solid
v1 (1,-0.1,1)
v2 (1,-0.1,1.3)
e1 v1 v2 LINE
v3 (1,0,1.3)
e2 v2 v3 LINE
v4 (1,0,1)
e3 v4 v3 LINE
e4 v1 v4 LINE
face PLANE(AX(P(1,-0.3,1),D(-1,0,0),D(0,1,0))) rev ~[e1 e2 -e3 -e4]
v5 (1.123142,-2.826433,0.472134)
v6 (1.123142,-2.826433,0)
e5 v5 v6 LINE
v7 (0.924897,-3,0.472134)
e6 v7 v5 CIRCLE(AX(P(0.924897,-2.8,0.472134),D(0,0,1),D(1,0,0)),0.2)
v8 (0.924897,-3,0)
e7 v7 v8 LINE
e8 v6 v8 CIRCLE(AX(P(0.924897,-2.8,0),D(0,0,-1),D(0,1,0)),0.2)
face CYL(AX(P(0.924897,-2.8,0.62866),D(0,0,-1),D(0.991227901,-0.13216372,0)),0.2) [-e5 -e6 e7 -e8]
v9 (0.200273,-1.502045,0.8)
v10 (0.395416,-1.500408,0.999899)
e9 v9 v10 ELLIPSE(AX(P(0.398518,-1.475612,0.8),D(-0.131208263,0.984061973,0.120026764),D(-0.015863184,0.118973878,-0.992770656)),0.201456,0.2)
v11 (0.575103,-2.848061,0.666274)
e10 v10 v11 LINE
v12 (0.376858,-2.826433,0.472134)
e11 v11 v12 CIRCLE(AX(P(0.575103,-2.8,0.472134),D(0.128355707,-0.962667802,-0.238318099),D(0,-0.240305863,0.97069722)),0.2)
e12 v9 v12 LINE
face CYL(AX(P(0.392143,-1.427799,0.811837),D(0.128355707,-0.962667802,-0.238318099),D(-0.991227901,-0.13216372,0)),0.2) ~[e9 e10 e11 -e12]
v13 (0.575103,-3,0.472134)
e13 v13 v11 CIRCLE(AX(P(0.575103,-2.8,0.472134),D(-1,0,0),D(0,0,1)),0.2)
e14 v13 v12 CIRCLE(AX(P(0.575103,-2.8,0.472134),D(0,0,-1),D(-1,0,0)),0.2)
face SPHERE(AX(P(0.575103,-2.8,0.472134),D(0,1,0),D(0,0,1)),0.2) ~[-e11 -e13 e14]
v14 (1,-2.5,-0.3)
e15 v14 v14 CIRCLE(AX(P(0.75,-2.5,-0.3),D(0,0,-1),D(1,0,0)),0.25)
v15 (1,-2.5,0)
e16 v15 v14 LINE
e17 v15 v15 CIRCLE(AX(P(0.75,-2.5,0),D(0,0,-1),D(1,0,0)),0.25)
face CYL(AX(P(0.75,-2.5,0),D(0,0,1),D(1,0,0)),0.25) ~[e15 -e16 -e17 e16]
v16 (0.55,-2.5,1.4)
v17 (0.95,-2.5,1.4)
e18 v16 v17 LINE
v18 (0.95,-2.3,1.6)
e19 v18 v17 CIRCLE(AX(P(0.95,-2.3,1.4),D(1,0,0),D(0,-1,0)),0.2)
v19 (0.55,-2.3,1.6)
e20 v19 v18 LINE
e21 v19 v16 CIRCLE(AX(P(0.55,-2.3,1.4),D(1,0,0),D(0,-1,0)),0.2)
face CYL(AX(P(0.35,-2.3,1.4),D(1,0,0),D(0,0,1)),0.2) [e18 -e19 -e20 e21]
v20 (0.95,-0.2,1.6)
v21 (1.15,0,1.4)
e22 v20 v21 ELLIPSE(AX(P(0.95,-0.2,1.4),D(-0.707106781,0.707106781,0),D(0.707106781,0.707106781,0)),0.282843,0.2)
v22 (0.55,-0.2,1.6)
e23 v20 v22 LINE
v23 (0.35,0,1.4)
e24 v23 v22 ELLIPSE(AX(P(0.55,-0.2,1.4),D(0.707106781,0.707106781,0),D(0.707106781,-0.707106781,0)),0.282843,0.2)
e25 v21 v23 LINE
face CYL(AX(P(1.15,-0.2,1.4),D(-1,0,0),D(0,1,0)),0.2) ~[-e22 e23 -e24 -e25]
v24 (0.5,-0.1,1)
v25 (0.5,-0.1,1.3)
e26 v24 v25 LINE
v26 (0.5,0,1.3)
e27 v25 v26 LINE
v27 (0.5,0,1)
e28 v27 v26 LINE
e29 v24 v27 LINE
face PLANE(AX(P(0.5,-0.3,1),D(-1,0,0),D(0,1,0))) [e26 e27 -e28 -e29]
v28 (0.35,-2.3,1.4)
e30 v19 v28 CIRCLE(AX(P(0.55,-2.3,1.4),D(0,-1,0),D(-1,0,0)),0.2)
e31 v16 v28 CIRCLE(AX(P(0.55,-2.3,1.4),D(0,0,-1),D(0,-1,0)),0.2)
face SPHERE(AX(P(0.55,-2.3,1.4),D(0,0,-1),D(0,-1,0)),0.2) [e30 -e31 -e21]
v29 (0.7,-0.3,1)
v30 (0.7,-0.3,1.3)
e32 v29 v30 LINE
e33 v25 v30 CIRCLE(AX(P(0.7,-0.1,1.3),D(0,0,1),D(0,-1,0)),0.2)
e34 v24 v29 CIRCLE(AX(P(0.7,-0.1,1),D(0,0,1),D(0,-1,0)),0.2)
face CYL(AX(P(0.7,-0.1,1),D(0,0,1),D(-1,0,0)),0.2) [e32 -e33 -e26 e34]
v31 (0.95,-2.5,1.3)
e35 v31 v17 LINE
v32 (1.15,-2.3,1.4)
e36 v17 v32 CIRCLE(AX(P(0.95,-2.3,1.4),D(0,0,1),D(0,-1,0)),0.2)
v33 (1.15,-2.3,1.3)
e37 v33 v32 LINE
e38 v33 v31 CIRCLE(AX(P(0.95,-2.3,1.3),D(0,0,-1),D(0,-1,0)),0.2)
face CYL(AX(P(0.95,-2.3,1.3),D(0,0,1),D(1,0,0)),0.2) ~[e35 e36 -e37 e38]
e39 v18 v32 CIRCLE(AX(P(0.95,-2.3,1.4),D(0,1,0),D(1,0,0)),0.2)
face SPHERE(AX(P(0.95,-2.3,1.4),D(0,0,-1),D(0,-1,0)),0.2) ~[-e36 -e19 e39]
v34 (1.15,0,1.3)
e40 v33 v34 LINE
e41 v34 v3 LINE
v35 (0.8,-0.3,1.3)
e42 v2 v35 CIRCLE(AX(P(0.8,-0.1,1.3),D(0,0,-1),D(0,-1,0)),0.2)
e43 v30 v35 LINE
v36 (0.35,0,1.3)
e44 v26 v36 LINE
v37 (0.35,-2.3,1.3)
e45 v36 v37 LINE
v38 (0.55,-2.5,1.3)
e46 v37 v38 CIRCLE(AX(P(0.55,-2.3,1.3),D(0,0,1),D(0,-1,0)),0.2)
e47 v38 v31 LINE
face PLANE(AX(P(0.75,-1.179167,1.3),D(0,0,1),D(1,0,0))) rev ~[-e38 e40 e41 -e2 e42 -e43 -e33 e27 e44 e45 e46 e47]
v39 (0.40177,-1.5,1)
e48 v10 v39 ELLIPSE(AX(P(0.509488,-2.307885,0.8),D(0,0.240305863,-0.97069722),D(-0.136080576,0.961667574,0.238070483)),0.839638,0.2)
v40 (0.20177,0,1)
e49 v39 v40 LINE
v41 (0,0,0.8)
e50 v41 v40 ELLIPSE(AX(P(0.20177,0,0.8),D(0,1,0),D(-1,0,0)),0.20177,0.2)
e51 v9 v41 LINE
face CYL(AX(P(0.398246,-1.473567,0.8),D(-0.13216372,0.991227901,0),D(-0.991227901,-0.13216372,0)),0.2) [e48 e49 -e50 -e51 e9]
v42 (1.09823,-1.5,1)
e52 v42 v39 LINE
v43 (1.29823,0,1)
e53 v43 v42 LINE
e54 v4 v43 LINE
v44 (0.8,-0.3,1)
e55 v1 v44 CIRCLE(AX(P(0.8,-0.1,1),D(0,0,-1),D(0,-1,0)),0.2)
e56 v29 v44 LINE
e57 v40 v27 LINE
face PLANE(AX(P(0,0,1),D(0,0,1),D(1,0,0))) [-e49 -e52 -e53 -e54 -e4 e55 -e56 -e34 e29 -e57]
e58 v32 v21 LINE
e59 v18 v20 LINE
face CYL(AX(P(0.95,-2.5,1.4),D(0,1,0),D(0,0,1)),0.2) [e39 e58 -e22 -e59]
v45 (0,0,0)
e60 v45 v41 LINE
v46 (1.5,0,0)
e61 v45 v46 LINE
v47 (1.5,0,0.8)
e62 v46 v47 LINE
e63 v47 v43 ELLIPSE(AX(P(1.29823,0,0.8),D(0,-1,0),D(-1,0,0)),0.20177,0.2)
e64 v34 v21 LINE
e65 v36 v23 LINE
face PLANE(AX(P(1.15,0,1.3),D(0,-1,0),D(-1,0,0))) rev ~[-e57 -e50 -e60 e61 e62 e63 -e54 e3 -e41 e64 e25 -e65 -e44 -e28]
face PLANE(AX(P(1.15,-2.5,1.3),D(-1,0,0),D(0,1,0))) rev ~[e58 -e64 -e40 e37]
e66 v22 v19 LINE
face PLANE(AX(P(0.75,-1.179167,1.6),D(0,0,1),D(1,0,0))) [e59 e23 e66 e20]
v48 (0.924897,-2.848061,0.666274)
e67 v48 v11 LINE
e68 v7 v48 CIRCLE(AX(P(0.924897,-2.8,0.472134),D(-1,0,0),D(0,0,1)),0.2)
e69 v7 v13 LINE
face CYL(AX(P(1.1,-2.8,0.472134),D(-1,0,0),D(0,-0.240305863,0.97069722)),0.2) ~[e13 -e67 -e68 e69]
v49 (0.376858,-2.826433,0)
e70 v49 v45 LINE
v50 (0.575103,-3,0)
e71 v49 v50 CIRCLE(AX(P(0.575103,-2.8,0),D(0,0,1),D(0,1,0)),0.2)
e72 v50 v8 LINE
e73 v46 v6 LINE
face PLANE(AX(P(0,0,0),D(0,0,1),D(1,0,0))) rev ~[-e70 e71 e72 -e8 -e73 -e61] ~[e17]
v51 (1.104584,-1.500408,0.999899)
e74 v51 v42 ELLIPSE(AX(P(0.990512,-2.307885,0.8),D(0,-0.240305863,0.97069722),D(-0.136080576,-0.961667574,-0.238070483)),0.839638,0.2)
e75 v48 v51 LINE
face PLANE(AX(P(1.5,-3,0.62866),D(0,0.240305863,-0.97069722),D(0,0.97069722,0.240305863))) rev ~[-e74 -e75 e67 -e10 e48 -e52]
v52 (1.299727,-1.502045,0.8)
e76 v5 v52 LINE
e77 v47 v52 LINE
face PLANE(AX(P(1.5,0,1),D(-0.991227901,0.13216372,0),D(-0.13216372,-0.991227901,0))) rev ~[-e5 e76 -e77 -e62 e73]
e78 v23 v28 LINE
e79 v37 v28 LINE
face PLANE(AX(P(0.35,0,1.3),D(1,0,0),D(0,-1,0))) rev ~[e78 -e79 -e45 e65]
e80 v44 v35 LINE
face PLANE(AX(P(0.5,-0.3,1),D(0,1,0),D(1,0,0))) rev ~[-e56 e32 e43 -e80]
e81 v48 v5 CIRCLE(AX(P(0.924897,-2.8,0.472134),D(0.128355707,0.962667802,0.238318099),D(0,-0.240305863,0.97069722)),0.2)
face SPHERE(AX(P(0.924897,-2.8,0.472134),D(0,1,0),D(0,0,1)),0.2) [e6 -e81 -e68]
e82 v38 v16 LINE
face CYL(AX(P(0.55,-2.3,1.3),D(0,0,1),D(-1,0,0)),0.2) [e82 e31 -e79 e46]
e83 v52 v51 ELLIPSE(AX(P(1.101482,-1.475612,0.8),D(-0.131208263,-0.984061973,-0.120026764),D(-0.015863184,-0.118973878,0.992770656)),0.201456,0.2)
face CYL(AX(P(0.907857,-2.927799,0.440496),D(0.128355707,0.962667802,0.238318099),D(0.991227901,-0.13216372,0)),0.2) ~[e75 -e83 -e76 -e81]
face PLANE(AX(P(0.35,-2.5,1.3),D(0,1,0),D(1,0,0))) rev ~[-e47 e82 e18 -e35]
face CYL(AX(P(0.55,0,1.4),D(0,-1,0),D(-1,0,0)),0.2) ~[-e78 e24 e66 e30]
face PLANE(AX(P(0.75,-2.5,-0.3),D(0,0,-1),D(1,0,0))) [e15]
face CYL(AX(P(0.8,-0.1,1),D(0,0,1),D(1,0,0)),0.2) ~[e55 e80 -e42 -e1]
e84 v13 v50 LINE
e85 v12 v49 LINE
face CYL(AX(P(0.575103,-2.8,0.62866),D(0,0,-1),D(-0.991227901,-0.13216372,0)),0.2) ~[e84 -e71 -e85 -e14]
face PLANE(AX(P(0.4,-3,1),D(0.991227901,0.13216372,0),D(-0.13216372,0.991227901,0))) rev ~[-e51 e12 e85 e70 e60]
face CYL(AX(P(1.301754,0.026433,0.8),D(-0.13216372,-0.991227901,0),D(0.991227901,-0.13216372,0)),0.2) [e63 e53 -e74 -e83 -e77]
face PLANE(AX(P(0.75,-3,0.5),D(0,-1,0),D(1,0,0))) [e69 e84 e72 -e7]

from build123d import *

# Parameters (mm, degrees)
F0_W      = 1.5
F0_H      = 1
F1_DEPTH  = 3
F3_DEPTH  = 25
F5_DEPTH  = 25
F6_R      = 0.25
F7_DEPTH  = 0.3
F8_W      = 0.5
F8_H      = 0.3
F9_DEPTH  = 0.3
F10_W     = 0.5
F10_H     = 0.3
F11_DEPTH = 0.3
F12_R     = 0.2
F13_R     = 0.2


with BuildPart() as f1:
    # F0 (on Front) → F1 (new body)
    with BuildSketch(Plane.XZ):
        with Locations((0.75, 0.5)):
            Rectangle(F0_W, F0_H)
    extrude(amount=F1_DEPTH)

    # F2 (on face) → F3 (cut)
    with BuildSketch(Plane.YZ.offset(1.5)):
        Polygon((-3, 1), (-3, 0.6286599091), (-1.5, 1), align=None)
    extrude(amount=-F3_DEPTH, mode=Mode.SUBTRACT)

    # F4 (on face) → F5 (cut)
    with BuildSketch(Plane.XY.offset(1)):
        Polygon((1.5, -1.5), (1.5, 0), (1.3, -1.5), align=None)
        Polygon((1.5, -1.5), (1.3, -1.5), (1.1, -3), (1.5, -3), align=None)
        Polygon((0.2, -1.5), (0, 0), (0, -1.5), align=None)
        Polygon((0.4, -3), (0.2, -1.5), (0, -1.5), (0, -3), align=None)
    extrude(amount=-F5_DEPTH, mode=Mode.SUBTRACT)

    # F6 (on face) → F7 (join)
    with BuildSketch(Plane(origin=(0, 0, 0), x_dir=(1, 0, 0), z_dir=(0, 0, -1))):
        with Locations((0.75, 2.5)):
            Circle(F6_R)
    extrude(amount=F7_DEPTH)

    # F8 (on face) → F9 (join)
    with BuildSketch(Plane.XY.offset(1)):
        with Locations((0.75, -0.15)):
            Rectangle(F8_W, F8_H)
    extrude(amount=F9_DEPTH)

    # F10 (on face) → F11 (join)
    with BuildSketch(Plane.XY.offset(1.3)):
        Polygon((0.5, 0), (0.35, 0), (0.35, -2.5), (1.15, -2.5), (1.15, 0), (1, 0), (1, -0.3), (0.5, -0.3), align=None)
        with Locations((0.75, -0.15)):
            Rectangle(F10_W, F10_H)
    extrude(amount=F11_DEPTH)

    # F12
    f12_edges = [f1.edges().sort_by_distance(p)[0] for p in [
        (1.2, -2.25, 0.81433),
        (0.3, -2.25, 0.81433),
        (0.75, -3, 0.62866),
        (1.4, -0.75, 1),
        (0.1, -0.75, 1),
        (0.4, -3, 0.31433),
        (1.1, -3, 0.31433),
    ]]
    fillet(f12_edges, radius=F12_R)

    # F13
    f13_edges = [f1.edges().sort_by_distance(p)[0] for p in [
        (1, -0.3, 1.15),
        (0.5, -0.3, 1.15),
        (0.35, -2.5, 1.45),
        (1.15, -2.5, 1.45),
        (0.75, -2.5, 1.6),
        (0.35, -1.25, 1.6),
        (1.15, -1.25, 1.6),
        (0.75, 0, 1.6),
    ]]
    fillet(f13_edges, radius=F13_R)


solid = f1.part
